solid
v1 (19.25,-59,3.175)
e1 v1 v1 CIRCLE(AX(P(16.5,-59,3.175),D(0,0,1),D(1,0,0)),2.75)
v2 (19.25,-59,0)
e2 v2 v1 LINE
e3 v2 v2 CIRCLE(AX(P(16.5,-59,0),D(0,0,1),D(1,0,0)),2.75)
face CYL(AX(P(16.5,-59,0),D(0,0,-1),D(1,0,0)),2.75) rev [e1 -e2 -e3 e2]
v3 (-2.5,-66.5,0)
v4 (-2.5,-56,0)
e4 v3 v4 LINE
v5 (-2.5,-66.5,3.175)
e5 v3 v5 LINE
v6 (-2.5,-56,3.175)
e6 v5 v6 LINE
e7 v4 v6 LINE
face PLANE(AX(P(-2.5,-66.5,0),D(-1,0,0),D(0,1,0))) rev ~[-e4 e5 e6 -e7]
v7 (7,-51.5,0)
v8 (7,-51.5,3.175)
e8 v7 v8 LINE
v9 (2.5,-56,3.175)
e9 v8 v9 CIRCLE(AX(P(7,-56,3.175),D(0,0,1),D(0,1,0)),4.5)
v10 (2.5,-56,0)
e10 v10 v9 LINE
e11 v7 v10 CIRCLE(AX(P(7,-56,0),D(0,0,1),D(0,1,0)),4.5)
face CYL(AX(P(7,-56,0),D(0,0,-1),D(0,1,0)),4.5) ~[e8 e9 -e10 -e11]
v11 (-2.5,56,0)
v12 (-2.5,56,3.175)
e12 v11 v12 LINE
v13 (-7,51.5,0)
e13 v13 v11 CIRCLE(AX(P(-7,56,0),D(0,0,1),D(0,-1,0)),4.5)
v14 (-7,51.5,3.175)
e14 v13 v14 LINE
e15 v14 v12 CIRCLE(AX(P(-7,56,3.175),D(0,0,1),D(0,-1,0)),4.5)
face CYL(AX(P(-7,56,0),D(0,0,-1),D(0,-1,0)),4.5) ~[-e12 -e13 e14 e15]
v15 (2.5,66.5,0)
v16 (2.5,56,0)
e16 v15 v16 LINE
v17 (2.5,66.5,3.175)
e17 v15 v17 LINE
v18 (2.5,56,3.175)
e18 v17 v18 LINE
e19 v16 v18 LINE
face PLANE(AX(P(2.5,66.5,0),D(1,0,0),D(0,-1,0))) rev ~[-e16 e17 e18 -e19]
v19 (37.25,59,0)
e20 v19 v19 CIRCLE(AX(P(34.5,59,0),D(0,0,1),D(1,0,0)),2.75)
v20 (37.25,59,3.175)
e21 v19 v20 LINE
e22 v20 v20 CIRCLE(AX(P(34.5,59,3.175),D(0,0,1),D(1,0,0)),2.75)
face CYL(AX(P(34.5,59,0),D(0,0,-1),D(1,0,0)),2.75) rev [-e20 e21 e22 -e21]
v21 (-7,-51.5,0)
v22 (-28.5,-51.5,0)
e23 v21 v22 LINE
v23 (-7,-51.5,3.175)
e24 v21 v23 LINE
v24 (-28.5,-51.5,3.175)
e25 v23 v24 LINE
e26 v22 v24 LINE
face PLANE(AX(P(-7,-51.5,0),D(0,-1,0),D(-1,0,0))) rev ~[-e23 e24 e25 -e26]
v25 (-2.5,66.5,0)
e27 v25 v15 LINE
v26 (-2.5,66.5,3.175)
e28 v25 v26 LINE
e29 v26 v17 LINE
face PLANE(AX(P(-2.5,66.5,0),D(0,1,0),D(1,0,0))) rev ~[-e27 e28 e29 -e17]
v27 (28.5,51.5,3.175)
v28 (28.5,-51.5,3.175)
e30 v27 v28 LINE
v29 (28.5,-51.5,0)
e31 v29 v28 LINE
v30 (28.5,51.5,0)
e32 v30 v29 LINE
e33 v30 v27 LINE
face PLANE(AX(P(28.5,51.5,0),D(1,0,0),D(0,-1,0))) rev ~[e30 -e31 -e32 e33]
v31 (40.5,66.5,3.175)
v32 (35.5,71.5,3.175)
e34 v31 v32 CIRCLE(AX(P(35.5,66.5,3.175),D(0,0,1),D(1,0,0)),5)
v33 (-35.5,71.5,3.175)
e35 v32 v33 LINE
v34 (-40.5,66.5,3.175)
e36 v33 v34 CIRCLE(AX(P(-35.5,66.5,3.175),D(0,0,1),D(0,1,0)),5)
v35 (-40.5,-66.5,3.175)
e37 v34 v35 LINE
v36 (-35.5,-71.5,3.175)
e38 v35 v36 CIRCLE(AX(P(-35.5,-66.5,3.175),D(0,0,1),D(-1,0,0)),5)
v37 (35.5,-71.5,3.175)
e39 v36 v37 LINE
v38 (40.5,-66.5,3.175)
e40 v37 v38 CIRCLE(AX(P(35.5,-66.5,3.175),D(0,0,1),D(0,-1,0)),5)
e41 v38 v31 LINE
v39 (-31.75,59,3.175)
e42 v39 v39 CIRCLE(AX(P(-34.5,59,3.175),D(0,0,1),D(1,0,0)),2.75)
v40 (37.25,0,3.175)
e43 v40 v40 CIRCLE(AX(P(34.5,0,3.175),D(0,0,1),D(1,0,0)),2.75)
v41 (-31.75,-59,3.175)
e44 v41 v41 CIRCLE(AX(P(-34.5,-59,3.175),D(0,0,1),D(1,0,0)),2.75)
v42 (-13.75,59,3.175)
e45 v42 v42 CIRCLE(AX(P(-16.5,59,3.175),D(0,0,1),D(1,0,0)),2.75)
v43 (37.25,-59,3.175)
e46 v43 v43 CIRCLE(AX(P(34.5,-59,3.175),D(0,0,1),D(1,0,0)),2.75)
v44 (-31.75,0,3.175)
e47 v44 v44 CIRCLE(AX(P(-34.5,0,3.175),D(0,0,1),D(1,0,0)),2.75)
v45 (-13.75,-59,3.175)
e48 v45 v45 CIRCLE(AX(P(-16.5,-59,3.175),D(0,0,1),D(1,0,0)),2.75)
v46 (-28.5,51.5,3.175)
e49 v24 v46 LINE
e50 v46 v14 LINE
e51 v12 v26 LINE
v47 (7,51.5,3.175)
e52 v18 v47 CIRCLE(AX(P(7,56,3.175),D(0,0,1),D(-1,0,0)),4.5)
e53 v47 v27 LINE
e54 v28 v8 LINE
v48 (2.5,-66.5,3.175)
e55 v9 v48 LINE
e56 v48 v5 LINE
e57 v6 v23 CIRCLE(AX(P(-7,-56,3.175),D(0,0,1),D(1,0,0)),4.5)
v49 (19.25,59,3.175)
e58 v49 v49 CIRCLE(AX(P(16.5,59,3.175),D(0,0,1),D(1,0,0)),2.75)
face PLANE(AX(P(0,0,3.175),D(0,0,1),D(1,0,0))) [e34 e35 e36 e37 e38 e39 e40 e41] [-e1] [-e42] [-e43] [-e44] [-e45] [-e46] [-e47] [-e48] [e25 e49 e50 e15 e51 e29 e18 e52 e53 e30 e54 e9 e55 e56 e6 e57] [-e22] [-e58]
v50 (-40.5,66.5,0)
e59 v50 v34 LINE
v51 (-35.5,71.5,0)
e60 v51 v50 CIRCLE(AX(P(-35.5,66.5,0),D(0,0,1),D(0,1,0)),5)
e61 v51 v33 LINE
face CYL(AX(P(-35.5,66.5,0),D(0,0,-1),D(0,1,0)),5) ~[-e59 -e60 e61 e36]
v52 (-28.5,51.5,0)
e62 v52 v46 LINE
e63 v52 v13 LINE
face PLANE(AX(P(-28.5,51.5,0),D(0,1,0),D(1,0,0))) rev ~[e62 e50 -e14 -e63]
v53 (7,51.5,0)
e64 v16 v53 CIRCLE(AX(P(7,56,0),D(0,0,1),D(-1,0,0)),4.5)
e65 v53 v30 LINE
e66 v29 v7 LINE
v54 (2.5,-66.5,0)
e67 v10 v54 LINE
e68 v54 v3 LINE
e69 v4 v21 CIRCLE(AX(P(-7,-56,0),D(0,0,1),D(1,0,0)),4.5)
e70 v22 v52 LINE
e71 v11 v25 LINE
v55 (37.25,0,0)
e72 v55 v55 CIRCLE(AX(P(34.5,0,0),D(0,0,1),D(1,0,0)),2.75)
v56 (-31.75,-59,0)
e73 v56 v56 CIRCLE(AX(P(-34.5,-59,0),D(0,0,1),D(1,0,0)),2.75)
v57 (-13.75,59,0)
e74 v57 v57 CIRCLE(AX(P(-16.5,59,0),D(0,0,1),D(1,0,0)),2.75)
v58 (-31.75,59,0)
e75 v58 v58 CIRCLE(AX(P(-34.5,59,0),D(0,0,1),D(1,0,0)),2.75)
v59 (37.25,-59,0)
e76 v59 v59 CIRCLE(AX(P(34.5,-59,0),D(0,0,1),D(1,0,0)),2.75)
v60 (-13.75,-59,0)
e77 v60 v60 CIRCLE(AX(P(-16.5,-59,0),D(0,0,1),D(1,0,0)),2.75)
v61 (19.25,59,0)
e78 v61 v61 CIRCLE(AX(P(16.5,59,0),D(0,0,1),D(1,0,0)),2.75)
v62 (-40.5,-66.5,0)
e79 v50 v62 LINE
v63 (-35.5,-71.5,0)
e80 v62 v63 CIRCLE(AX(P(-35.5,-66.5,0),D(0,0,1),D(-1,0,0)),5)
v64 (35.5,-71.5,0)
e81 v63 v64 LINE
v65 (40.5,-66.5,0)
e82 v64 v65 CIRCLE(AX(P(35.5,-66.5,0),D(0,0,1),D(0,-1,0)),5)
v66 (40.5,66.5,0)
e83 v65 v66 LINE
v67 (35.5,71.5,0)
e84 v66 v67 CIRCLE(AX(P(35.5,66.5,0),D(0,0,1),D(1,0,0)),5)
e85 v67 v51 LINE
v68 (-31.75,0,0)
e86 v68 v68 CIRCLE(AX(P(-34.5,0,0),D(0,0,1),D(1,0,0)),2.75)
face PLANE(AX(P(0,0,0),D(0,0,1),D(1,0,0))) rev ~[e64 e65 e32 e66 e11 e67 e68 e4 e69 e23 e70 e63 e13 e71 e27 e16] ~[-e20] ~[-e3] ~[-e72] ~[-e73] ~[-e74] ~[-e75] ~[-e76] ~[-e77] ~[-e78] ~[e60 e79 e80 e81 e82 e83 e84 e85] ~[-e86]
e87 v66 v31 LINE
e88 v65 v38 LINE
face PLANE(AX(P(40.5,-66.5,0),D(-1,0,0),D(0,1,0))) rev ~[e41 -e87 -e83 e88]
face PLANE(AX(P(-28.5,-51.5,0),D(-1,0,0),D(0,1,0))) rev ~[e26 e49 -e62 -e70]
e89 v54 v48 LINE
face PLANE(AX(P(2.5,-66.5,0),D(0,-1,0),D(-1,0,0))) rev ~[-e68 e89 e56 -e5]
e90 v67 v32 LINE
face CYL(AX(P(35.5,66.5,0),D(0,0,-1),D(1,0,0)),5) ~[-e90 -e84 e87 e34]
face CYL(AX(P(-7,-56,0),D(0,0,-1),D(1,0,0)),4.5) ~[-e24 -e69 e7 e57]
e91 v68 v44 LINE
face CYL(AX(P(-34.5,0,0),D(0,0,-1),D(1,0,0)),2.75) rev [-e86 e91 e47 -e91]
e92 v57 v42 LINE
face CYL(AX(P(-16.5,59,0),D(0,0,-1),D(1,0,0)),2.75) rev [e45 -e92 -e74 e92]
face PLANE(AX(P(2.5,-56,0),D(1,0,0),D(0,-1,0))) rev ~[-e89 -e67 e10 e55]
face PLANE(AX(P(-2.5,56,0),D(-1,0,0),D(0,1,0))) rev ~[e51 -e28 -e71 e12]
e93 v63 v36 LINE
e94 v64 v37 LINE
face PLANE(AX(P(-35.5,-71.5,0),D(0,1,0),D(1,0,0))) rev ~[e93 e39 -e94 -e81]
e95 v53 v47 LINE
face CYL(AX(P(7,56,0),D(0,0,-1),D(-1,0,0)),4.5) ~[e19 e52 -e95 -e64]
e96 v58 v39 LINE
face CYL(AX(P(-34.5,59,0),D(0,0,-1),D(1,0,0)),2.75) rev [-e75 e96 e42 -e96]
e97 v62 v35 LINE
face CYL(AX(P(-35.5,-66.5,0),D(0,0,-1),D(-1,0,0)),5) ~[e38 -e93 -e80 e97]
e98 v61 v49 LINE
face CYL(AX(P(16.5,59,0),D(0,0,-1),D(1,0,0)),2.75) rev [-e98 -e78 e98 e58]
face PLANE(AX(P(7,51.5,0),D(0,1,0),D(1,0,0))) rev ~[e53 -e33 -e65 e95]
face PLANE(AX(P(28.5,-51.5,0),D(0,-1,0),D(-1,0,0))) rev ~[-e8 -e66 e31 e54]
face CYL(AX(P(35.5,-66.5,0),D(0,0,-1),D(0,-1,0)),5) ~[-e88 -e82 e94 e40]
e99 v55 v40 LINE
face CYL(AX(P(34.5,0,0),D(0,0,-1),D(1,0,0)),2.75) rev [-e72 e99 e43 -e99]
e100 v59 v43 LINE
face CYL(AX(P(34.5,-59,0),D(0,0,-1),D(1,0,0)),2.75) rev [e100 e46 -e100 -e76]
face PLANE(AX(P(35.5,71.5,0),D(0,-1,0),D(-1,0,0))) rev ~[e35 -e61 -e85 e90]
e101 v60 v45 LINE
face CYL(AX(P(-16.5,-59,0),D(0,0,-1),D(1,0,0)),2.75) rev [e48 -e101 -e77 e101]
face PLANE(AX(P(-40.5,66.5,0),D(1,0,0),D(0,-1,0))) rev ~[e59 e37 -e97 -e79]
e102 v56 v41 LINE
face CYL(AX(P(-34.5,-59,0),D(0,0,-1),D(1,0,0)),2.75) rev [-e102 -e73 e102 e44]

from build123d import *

# Parameters (mm, degrees)
F0_R     = 2.75
F1_DEPTH = 3.175


# Not quite as in the source:
# - a length typed as a fraction of an inch, garbled in the dataset ("3 / 203.2 mm" for 3/8 in), is restored


with BuildPart() as f1:
    # F0 (on Top) → F1 (new body)
    with BuildSketch(Plane.XY):
        with BuildLine():
            Line((-35.5, -71.5), (35.5, -71.5))
            ThreePointArc((35.5, -71.5), (39.0355339059, -70.0355339059), (40.5, -66.5))
            Line((40.5, -66.5), (40.5, 66.5))
            ThreePointArc((40.5, 66.5), (39.0355339059, 70.0355339059), (35.5, 71.5))
            Line((35.5, 71.5), (-35.5, 71.5))
            ThreePointArc((-35.5, 71.5), (-39.0355339059, 70.0355339059), (-40.5, 66.5))
            Line((-40.5, 66.5), (-40.5, -66.5))
            ThreePointArc((-40.5, -66.5), (-39.0355339059, -70.0355339059), (-35.5, -71.5))
        make_face()
        with Locations((-34.5, -59)):
            Circle(F0_R, mode=Mode.SUBTRACT)
        with Locations((-16.5, -59)):
            Circle(F0_R, mode=Mode.SUBTRACT)
        with Locations((16.5, -59)):
            Circle(F0_R, mode=Mode.SUBTRACT)
        with Locations((34.5, -59)):
            Circle(F0_R, mode=Mode.SUBTRACT)
        with Locations((-34.5, 0)):
            Circle(F0_R, mode=Mode.SUBTRACT)
        with Locations((-34.5, 59)):
            Circle(F0_R, mode=Mode.SUBTRACT)
        with Locations((-16.5, 59)):
            Circle(F0_R, mode=Mode.SUBTRACT)
        with BuildLine():
            Line((28.5, 51.5), (28.5, -51.5))
            Line((28.5, -51.5), (7, -51.5))
            ThreePointArc((7, -51.5), (3.8180194847, -52.8180194847), (2.5, -56))
            Line((2.5, -56), (2.5, -66.5))
            Line((2.5, -66.5), (-2.5, -66.5))
            Line((-2.5, -66.5), (-2.5, -56))
            ThreePointArc((-2.5, -56), (-3.8180194847, -52.8180194847), (-7, -51.5))
            Line((-7, -51.5), (-28.5, -51.5))
            Line((-28.5, -51.5), (-28.5, 51.5))
            Line((-28.5, 51.5), (-7, 51.5))
            ThreePointArc((-7, 51.5), (-3.8180194847, 52.8180194847), (-2.5, 56))
            Line((-2.5, 56), (-2.5, 66.5))
            Line((-2.5, 66.5), (2.5, 66.5))
            Line((2.5, 66.5), (2.5, 56))
            ThreePointArc((2.5, 56), (3.8180194847, 52.8180194847), (7, 51.5))
            Line((7, 51.5), (28.5, 51.5))
        make_face(mode=Mode.SUBTRACT)
        with Locations((34.5, 0)):
            Circle(F0_R, mode=Mode.SUBTRACT)
        with Locations((16.5, 59)):
            Circle(F0_R, mode=Mode.SUBTRACT)
        with Locations((34.5, 59)):
            Circle(F0_R, mode=Mode.SUBTRACT)
    extrude(amount=F1_DEPTH)


solid = f1.part
